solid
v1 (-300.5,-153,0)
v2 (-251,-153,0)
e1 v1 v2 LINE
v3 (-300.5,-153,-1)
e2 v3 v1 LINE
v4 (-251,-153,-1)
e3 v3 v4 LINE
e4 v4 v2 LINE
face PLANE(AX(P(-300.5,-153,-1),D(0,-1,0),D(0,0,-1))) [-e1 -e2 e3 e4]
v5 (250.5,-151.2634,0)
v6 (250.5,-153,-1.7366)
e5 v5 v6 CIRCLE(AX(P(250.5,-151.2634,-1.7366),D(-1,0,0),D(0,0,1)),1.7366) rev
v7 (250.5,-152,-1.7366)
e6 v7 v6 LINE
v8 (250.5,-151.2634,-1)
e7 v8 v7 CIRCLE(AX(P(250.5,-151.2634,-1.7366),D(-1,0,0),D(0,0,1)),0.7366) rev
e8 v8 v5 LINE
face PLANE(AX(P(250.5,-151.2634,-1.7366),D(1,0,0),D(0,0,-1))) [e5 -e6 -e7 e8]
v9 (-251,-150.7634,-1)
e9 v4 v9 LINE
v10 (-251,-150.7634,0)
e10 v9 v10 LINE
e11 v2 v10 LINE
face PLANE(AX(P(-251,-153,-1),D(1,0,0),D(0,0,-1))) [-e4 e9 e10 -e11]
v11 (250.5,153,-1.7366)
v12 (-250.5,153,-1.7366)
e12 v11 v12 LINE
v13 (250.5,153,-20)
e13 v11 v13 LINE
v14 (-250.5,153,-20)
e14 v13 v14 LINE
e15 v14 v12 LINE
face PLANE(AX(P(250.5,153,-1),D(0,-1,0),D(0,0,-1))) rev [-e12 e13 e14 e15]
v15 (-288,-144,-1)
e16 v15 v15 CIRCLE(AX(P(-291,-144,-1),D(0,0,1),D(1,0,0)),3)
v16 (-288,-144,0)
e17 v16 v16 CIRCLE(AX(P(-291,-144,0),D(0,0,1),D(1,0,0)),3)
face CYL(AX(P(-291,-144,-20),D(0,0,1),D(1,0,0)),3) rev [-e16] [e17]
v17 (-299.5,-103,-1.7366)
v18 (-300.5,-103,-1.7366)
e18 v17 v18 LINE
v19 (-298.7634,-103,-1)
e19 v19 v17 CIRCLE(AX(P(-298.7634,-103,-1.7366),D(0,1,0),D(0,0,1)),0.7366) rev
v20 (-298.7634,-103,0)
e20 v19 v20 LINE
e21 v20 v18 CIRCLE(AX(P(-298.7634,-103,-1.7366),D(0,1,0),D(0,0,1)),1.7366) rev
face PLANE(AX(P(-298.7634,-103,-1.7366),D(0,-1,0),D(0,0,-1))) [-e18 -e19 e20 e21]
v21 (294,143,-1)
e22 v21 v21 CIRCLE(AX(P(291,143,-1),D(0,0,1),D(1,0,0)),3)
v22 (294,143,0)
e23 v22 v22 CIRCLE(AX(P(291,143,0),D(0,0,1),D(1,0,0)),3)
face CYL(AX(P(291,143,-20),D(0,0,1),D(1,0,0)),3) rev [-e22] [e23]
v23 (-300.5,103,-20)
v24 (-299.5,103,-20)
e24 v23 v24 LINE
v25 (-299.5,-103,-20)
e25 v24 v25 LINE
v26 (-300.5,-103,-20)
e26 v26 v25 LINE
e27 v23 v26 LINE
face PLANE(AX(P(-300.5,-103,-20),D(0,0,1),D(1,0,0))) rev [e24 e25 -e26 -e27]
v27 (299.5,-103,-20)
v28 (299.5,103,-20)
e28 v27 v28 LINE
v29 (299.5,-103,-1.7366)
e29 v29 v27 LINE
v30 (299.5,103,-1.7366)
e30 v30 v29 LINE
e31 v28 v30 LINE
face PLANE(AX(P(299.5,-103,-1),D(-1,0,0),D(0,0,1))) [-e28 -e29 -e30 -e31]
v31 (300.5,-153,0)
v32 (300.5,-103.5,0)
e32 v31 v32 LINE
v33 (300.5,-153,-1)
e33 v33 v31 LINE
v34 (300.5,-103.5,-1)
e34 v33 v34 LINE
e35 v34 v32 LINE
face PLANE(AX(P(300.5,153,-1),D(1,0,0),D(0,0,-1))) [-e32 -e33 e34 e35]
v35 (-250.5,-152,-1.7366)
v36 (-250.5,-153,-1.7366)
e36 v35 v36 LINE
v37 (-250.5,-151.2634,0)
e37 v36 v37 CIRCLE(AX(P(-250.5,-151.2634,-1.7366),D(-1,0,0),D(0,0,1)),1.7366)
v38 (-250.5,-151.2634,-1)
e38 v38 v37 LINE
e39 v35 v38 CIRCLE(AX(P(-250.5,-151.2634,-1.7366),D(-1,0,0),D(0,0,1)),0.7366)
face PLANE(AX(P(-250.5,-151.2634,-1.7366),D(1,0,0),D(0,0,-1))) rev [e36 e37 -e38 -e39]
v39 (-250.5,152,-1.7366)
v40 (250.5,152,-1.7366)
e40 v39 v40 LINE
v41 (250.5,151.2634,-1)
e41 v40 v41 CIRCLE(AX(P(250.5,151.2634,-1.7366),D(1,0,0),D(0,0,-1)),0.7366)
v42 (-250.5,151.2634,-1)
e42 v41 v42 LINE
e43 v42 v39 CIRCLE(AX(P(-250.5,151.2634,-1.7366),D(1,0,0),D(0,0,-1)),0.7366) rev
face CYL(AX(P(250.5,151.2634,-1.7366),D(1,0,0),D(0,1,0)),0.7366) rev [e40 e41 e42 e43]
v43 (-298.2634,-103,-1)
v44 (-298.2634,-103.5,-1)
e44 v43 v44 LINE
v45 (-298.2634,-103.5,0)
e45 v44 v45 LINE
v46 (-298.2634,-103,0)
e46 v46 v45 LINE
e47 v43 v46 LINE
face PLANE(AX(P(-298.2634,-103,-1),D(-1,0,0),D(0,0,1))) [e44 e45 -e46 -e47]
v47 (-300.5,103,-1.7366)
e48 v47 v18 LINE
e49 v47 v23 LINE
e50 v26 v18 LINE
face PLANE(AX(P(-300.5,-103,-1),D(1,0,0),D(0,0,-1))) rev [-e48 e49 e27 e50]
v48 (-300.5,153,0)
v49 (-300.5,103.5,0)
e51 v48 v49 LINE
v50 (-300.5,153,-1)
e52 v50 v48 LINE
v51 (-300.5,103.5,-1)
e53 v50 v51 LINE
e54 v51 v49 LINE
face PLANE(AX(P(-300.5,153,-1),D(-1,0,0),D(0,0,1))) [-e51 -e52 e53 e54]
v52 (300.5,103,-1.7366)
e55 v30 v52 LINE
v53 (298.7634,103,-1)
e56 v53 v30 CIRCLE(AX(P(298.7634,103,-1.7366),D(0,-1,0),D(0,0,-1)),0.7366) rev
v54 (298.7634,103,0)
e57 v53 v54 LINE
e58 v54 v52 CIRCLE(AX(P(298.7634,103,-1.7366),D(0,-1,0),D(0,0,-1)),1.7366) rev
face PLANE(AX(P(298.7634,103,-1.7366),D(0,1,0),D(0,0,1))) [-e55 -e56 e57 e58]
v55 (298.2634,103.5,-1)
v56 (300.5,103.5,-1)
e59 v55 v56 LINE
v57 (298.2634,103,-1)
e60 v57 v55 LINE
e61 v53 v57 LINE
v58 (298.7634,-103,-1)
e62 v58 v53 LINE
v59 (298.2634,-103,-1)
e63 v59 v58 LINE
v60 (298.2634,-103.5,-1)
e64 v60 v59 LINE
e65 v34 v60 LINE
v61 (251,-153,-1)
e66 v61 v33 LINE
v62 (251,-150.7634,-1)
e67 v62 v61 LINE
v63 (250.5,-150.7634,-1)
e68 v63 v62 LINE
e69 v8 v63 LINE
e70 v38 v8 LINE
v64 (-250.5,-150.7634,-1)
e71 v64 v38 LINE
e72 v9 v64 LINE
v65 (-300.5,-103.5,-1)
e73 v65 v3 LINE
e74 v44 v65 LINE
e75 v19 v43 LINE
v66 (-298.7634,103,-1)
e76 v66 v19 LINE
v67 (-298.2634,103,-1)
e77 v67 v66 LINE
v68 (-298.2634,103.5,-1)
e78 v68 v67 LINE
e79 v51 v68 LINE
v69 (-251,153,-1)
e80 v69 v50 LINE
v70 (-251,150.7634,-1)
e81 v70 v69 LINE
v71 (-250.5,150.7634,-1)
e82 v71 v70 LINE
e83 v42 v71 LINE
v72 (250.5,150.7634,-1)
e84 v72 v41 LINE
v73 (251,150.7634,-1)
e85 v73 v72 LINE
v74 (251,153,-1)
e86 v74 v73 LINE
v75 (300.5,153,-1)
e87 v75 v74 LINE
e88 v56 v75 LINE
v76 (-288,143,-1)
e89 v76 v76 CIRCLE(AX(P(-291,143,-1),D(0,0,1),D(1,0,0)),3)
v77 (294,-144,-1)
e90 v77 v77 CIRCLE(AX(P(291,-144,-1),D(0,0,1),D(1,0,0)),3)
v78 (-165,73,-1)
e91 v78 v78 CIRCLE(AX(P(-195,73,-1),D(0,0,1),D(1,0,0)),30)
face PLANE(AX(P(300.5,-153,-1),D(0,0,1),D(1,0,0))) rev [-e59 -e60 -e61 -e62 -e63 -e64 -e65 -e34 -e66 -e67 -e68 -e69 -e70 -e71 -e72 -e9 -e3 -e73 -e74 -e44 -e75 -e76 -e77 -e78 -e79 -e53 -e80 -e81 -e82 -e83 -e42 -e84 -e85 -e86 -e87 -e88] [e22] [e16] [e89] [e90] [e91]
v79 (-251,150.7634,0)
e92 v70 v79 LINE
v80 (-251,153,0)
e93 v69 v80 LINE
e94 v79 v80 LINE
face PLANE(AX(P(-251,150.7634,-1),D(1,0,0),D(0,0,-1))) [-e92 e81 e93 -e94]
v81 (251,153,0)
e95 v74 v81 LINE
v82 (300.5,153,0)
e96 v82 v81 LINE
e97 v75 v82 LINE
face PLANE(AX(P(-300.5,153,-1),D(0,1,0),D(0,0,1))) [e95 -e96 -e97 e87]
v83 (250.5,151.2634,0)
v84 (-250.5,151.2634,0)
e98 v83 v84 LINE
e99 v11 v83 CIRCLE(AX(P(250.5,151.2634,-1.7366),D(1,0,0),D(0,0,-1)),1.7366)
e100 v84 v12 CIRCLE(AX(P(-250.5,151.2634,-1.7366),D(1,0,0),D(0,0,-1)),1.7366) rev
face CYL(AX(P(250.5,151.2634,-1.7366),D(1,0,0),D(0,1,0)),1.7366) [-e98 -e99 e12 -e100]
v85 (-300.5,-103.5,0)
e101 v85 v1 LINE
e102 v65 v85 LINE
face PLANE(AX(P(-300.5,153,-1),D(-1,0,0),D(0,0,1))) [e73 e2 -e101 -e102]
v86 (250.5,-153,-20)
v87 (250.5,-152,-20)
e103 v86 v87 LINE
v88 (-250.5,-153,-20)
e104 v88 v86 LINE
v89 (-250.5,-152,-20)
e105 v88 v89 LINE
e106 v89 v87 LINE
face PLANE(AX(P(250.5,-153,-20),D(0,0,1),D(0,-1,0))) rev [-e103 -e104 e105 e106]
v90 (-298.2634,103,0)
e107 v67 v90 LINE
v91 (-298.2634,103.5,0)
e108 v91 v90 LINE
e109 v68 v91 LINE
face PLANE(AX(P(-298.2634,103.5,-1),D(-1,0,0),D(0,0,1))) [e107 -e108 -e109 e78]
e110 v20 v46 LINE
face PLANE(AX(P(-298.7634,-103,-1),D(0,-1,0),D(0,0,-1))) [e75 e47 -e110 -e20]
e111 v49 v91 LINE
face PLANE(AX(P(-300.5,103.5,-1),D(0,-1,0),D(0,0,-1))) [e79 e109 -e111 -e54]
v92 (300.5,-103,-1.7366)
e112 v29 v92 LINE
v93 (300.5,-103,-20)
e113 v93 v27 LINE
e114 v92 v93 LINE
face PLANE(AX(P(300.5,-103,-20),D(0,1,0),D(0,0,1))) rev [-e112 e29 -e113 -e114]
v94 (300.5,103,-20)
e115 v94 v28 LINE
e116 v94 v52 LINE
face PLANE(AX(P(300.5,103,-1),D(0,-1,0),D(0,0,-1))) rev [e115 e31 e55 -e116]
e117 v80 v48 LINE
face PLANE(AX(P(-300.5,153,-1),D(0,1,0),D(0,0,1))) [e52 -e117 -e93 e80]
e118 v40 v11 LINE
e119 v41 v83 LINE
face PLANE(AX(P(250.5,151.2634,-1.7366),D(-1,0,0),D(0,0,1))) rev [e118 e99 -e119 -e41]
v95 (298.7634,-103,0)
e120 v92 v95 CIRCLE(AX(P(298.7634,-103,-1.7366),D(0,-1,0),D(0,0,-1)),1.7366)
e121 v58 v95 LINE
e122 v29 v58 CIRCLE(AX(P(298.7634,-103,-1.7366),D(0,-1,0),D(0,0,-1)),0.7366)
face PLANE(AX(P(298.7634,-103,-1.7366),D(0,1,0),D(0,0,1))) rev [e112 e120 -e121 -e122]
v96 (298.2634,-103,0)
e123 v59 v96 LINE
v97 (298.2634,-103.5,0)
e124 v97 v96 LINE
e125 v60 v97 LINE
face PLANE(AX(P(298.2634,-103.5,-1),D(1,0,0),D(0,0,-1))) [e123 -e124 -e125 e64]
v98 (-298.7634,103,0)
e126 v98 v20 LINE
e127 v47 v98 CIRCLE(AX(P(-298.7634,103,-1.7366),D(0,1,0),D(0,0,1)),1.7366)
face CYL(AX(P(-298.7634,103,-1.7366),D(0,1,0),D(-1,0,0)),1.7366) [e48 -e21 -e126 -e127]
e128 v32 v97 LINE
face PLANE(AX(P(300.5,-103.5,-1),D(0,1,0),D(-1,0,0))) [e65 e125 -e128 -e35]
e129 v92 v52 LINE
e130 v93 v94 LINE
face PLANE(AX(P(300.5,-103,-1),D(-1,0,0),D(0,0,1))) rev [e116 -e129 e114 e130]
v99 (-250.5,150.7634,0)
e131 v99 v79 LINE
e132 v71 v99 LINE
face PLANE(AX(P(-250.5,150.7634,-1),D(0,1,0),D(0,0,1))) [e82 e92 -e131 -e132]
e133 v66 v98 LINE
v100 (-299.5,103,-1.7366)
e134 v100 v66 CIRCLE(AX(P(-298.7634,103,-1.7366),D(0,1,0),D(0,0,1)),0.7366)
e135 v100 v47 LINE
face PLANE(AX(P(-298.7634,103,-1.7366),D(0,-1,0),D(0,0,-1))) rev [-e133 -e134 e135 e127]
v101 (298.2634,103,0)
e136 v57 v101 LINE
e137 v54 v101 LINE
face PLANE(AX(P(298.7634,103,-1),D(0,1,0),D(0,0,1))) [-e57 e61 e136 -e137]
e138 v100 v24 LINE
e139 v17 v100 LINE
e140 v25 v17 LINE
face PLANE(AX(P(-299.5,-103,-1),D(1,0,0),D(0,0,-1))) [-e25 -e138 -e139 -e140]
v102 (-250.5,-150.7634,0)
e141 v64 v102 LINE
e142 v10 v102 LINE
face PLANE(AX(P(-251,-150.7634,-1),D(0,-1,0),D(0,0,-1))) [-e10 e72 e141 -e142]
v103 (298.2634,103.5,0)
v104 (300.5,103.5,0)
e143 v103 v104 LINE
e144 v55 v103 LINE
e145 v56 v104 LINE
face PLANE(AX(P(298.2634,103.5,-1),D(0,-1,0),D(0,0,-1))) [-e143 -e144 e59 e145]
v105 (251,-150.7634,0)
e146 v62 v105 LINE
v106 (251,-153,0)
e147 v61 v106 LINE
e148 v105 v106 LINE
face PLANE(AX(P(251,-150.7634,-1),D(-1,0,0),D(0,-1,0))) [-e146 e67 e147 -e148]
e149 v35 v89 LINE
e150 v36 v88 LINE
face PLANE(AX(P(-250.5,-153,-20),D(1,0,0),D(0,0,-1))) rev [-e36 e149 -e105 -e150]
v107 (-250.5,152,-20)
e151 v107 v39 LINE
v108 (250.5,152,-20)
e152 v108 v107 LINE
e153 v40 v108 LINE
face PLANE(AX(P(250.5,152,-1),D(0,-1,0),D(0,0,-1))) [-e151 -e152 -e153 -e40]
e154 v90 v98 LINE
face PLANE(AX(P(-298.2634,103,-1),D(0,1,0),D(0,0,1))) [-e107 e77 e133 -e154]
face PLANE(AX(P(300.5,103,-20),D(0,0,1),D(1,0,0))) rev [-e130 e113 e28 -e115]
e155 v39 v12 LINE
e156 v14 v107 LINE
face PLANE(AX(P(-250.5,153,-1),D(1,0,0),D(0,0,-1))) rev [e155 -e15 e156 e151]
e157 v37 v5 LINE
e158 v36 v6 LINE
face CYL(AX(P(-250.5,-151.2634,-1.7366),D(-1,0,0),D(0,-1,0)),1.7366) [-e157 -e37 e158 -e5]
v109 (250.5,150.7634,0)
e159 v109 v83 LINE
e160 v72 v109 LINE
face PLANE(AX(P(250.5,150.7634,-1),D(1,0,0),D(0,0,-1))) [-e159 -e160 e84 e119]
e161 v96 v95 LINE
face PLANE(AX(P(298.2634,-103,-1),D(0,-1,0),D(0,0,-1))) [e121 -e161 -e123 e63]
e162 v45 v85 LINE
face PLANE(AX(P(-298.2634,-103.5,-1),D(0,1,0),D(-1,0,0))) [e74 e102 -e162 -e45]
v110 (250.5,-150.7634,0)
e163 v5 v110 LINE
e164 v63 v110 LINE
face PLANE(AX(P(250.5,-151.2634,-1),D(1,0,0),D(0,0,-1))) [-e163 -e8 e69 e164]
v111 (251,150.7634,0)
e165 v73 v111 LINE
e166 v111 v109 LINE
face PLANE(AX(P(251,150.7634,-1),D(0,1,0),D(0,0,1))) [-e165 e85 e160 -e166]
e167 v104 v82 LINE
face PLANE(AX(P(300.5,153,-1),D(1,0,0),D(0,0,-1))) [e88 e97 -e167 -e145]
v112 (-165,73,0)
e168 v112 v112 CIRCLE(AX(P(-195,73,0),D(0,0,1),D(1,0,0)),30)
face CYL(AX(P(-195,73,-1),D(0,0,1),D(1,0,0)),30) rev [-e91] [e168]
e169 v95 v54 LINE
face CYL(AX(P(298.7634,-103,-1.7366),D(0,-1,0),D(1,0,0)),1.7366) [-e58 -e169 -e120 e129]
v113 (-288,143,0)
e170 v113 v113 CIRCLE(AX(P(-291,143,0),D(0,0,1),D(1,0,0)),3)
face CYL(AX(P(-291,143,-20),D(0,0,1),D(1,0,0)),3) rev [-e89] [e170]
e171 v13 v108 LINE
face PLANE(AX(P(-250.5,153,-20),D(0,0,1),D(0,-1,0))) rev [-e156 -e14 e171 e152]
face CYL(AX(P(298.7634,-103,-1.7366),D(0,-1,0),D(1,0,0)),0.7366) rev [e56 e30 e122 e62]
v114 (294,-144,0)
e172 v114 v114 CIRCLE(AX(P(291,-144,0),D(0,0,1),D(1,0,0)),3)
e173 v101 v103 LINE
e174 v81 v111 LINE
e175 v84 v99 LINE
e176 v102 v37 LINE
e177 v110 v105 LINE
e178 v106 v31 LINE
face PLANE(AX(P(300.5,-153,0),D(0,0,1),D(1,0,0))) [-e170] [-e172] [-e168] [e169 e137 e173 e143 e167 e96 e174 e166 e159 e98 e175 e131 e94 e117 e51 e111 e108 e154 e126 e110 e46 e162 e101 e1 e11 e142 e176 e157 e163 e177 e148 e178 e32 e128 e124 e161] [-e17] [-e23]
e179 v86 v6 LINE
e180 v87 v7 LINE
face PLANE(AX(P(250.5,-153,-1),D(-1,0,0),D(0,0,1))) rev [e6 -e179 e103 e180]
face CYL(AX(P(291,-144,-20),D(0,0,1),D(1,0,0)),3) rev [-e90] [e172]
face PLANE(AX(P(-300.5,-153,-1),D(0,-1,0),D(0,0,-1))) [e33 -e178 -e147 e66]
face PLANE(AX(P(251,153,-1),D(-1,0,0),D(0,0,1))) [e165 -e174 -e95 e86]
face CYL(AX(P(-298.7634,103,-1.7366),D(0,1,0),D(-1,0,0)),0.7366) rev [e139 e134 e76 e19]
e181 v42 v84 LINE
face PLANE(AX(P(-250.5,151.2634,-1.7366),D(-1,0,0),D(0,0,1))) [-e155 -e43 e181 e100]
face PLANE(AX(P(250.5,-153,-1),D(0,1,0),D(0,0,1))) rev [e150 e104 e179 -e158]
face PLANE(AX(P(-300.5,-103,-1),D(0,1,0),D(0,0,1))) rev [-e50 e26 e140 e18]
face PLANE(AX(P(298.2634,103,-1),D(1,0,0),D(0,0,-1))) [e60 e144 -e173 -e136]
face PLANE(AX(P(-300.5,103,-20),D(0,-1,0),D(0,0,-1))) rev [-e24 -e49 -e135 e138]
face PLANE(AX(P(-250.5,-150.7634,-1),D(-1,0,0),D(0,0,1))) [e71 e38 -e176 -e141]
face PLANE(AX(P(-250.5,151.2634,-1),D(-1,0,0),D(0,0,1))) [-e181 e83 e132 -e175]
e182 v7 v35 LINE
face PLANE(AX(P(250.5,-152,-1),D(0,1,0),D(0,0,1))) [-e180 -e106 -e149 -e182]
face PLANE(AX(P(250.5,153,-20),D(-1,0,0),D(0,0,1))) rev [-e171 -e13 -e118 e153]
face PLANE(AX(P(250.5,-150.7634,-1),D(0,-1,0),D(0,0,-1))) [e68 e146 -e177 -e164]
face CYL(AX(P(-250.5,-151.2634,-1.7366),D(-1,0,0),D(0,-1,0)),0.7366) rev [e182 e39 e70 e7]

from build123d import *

# Parameters (mm, degrees)
SKETCH_1_W                        = 601
SKETCH_1_H                        = 306
SKETCH_1_R                        = 30
SM_BASE_FLANGE_1_DEPTH            = 1
SM_EDGE_FLANGE_1_STRIP_W          = 5.4732
SM_EDGE_FLANGE_1_STRIP_H          = 1
SM_EDGE_FLANGE_1_STRIP_CUT_DEPTH  = 501
SM_EDGE_FLANGE_1_RELIEF_W         = 5.9732
SM_EDGE_FLANGE_1_RELIEF_H         = 0.5
SM_EDGE_FLANGE_1_RELIEF_CUT_DEPTH = 1
SM_EDGE_FLANGE_1_DEPTH            = 501
SM_EDGE_FLANGE_2_STRIP_W          = 5.4732
SM_EDGE_FLANGE_2_STRIP_H          = 1
SM_EDGE_FLANGE_2_STRIP_CUT_DEPTH  = 206
SM_EDGE_FLANGE_2_RELIEF_W         = 5.9732
SM_EDGE_FLANGE_2_RELIEF_H         = 0.5
SM_EDGE_FLANGE_2_RELIEF_CUT_DEPTH = 1
SM_EDGE_FLANGE_2_DEPTH            = 206
SM_EDGE_FLANGE_3_STRIP_W          = 5.4732
SM_EDGE_FLANGE_3_STRIP_H          = 1
SM_EDGE_FLANGE_3_STRIP_CUT_DEPTH  = 501
SM_EDGE_FLANGE_3_RELIEF_W         = 5.9732
SM_EDGE_FLANGE_3_RELIEF_H         = 0.5
SM_EDGE_FLANGE_3_RELIEF_CUT_DEPTH = 1
SM_EDGE_FLANGE_3_DEPTH            = 501
SM_EDGE_FLANGE_4_STRIP_W          = 5.4732
SM_EDGE_FLANGE_4_STRIP_H          = 1
SM_EDGE_FLANGE_4_STRIP_CUT_DEPTH  = 206
SM_EDGE_FLANGE_4_RELIEF_W         = 5.9732
SM_EDGE_FLANGE_4_RELIEF_H         = 0.5
SM_EDGE_FLANGE_4_RELIEF_CUT_DEPTH = 1
SM_EDGE_FLANGE_4_DEPTH            = 206
SKETCH_15_R                       = 3
CUT_EXTRUDE_1_DEPTH               = 338.800606867


# Sheet-metal steps are written as plain solids
with BuildPart() as part:
    # Sketch 1 → 基体-法兰1 (new body)
    with BuildSketch(Plane.XY):
        Rectangle(SKETCH_1_W, SKETCH_1_H)
        with Locations((-195, 73)):
            Circle(SKETCH_1_R, mode=Mode.SUBTRACT)
    extrude(amount=-SM_BASE_FLANGE_1_DEPTH)

    # 边线-法兰1 strip (across the edge) → 边线-法兰1 strip cut (cut)
    with BuildSketch(Plane(origin=(-250.5, 153, -1), x_dir=(0, -1, 0), z_dir=(1, 0, 0))):
        with Locations((-1, -0.5)):
            Rectangle(SM_EDGE_FLANGE_1_STRIP_W, SM_EDGE_FLANGE_1_STRIP_H)
    extrude(amount=SM_EDGE_FLANGE_1_STRIP_CUT_DEPTH, mode=Mode.SUBTRACT)

    # 边线-法兰1 relief (on the sheet) → 边线-法兰1 relief cut (cut)
    with BuildSketch(Plane(origin=(-250.5, 151.2634, -1), x_dir=(0, -1, 0), z_dir=(0, 0, -1))):
        with Locations((-2.4866, 0.25)):
            Rectangle(SM_EDGE_FLANGE_1_RELIEF_W, SM_EDGE_FLANGE_1_RELIEF_H)
        with Locations((-2.4866, -501.25)):
            Rectangle(SM_EDGE_FLANGE_1_RELIEF_W, SM_EDGE_FLANGE_1_RELIEF_H)
    extrude(amount=-SM_EDGE_FLANGE_1_RELIEF_CUT_DEPTH, mode=Mode.SUBTRACT)

    # 边线-法兰1 section (across the edge) → 边线-法兰1 (add)
    with BuildSketch(Plane(origin=(-250.5, 153, -1), x_dir=(0, -1, 0), z_dir=(1, 0, 0))):
        with BuildLine():
            Line((0, 0.7366), (0, 19))
            Line((0, 19), (1, 19))
            Line((1, 19), (1, 0.7366))
            ThreePointArc((1, 0.7366), (1.215745145, 0.215745145), (1.7366, 0))
            Line((1.7366, 0), (1.7366, -1))
            ThreePointArc((1.7366, -1), (0.508638364, -0.491361636), (0, 0.7366))
        make_face()
    extrude(amount=SM_EDGE_FLANGE_1_DEPTH)

    # 边线-法兰2 strip (across the edge) → 边线-法兰2 strip cut (cut)
    with BuildSketch(Plane(origin=(300.5, 103, -1), x_dir=(-1, 0, 0), z_dir=(0, -1, 0))):
        with Locations((-1, -0.5)):
            Rectangle(SM_EDGE_FLANGE_2_STRIP_W, SM_EDGE_FLANGE_2_STRIP_H)
    extrude(amount=SM_EDGE_FLANGE_2_STRIP_CUT_DEPTH, mode=Mode.SUBTRACT)

    # 边线-法兰2 relief (on the sheet) → 边线-法兰2 relief cut (cut)
    with BuildSketch(Plane(origin=(298.7634, 103, -1), x_dir=(-1, 0, 0), z_dir=(0, 0, -1))):
        with Locations((-2.4866, 0.25)):
            Rectangle(SM_EDGE_FLANGE_2_RELIEF_W, SM_EDGE_FLANGE_2_RELIEF_H)
        with Locations((-2.4866, -206.25)):
            Rectangle(SM_EDGE_FLANGE_2_RELIEF_W, SM_EDGE_FLANGE_2_RELIEF_H)
    extrude(amount=-SM_EDGE_FLANGE_2_RELIEF_CUT_DEPTH, mode=Mode.SUBTRACT)

    # 边线-法兰2 section (across the edge) → 边线-法兰2 (add)
    with BuildSketch(Plane(origin=(300.5, 103, -1), x_dir=(-1, 0, 0), z_dir=(0, -1, 0))):
        with BuildLine():
            Line((0, 0.7366), (0, 19))
            Line((0, 19), (1, 19))
            Line((1, 19), (1, 0.7366))
            ThreePointArc((1, 0.7366), (1.215745145, 0.215745145), (1.7366, 0))
            Line((1.7366, 0), (1.7366, -1))
            ThreePointArc((1.7366, -1), (0.508638364, -0.491361636), (0, 0.7366))
        make_face()
    extrude(amount=SM_EDGE_FLANGE_2_DEPTH)

    # 边线-法兰3 strip (across the edge) → 边线-法兰3 strip cut (cut)
    with BuildSketch(Plane(origin=(250.5, -153, -1), x_dir=(0, 1, 0), z_dir=(-1, 0, 0))):
        with Locations((-1, -0.5)):
            Rectangle(SM_EDGE_FLANGE_3_STRIP_W, SM_EDGE_FLANGE_3_STRIP_H)
    extrude(amount=SM_EDGE_FLANGE_3_STRIP_CUT_DEPTH, mode=Mode.SUBTRACT)

    # 边线-法兰3 relief (on the sheet) → 边线-法兰3 relief cut (cut)
    with BuildSketch(Plane(origin=(250.5, -151.2634, -1), x_dir=(0, 1, 0), z_dir=(0, 0, -1))):
        with Locations((-2.4866, 0.25)):
            Rectangle(SM_EDGE_FLANGE_3_RELIEF_W, SM_EDGE_FLANGE_3_RELIEF_H)
        with Locations((-2.4866, -501.25)):
            Rectangle(SM_EDGE_FLANGE_3_RELIEF_W, SM_EDGE_FLANGE_3_RELIEF_H)
    extrude(amount=-SM_EDGE_FLANGE_3_RELIEF_CUT_DEPTH, mode=Mode.SUBTRACT)

    # 边线-法兰3 section (across the edge) → 边线-法兰3 (add)
    with BuildSketch(Plane(origin=(250.5, -153, -1), x_dir=(0, 1, 0), z_dir=(-1, 0, 0))):
        with BuildLine():
            Line((0, 0.7366), (0, 19))
            Line((0, 19), (1, 19))
            Line((1, 19), (1, 0.7366))
            ThreePointArc((1, 0.7366), (1.215745145, 0.215745145), (1.7366, 0))
            Line((1.7366, 0), (1.7366, -1))
            ThreePointArc((1.7366, -1), (0.508638364, -0.491361636), (0, 0.7366))
        make_face()
    extrude(amount=SM_EDGE_FLANGE_3_DEPTH)

    # 边线-法兰4 strip (across the edge) → 边线-法兰4 strip cut (cut)
    with BuildSketch(Plane(origin=(-300.5, -103, -1), x_dir=(1, 0, 0), z_dir=(0, 1, 0))):
        with Locations((-1, -0.5)):
            Rectangle(SM_EDGE_FLANGE_4_STRIP_W, SM_EDGE_FLANGE_4_STRIP_H)
    extrude(amount=SM_EDGE_FLANGE_4_STRIP_CUT_DEPTH, mode=Mode.SUBTRACT)

    # 边线-法兰4 relief (on the sheet) → 边线-法兰4 relief cut (cut)
    with BuildSketch(Plane(origin=(-298.7634, -103, -1), x_dir=(1, 0, 0), z_dir=(0, 0, -1))):
        with Locations((-2.4866, 0.25)):
            Rectangle(SM_EDGE_FLANGE_4_RELIEF_W, SM_EDGE_FLANGE_4_RELIEF_H)
        with Locations((-2.4866, -206.25)):
            Rectangle(SM_EDGE_FLANGE_4_RELIEF_W, SM_EDGE_FLANGE_4_RELIEF_H)
    extrude(amount=-SM_EDGE_FLANGE_4_RELIEF_CUT_DEPTH, mode=Mode.SUBTRACT)

    # 边线-法兰4 section (across the edge) → 边线-法兰4 (add)
    with BuildSketch(Plane(origin=(-300.5, -103, -1), x_dir=(1, 0, 0), z_dir=(0, 1, 0))):
        with BuildLine():
            Line((0, 0.7366), (0, 19))
            Line((0, 19), (1, 19))
            Line((1, 19), (1, 0.7366))
            ThreePointArc((1, 0.7366), (1.215745145, 0.215745145), (1.7366, 0))
            Line((1.7366, 0), (1.7366, -1))
            ThreePointArc((1.7366, -1), (0.508638364, -0.491361636), (0, 0.7366))
        make_face()
    extrude(amount=SM_EDGE_FLANGE_4_DEPTH)

    # 草图15 → 切除-拉伸1 (cut, through all)
    with BuildSketch(Plane.XY):
        with Locations((-291, -144)):
            Circle(SKETCH_15_R)
        with Locations((-291, 143)):
            Circle(SKETCH_15_R)
        with Locations((291, 143)):
            Circle(SKETCH_15_R)
        with Locations((291, -144)):
            Circle(SKETCH_15_R)
    extrude(amount=-CUT_EXTRUDE_1_DEPTH, mode=Mode.SUBTRACT)


solid = part.part
